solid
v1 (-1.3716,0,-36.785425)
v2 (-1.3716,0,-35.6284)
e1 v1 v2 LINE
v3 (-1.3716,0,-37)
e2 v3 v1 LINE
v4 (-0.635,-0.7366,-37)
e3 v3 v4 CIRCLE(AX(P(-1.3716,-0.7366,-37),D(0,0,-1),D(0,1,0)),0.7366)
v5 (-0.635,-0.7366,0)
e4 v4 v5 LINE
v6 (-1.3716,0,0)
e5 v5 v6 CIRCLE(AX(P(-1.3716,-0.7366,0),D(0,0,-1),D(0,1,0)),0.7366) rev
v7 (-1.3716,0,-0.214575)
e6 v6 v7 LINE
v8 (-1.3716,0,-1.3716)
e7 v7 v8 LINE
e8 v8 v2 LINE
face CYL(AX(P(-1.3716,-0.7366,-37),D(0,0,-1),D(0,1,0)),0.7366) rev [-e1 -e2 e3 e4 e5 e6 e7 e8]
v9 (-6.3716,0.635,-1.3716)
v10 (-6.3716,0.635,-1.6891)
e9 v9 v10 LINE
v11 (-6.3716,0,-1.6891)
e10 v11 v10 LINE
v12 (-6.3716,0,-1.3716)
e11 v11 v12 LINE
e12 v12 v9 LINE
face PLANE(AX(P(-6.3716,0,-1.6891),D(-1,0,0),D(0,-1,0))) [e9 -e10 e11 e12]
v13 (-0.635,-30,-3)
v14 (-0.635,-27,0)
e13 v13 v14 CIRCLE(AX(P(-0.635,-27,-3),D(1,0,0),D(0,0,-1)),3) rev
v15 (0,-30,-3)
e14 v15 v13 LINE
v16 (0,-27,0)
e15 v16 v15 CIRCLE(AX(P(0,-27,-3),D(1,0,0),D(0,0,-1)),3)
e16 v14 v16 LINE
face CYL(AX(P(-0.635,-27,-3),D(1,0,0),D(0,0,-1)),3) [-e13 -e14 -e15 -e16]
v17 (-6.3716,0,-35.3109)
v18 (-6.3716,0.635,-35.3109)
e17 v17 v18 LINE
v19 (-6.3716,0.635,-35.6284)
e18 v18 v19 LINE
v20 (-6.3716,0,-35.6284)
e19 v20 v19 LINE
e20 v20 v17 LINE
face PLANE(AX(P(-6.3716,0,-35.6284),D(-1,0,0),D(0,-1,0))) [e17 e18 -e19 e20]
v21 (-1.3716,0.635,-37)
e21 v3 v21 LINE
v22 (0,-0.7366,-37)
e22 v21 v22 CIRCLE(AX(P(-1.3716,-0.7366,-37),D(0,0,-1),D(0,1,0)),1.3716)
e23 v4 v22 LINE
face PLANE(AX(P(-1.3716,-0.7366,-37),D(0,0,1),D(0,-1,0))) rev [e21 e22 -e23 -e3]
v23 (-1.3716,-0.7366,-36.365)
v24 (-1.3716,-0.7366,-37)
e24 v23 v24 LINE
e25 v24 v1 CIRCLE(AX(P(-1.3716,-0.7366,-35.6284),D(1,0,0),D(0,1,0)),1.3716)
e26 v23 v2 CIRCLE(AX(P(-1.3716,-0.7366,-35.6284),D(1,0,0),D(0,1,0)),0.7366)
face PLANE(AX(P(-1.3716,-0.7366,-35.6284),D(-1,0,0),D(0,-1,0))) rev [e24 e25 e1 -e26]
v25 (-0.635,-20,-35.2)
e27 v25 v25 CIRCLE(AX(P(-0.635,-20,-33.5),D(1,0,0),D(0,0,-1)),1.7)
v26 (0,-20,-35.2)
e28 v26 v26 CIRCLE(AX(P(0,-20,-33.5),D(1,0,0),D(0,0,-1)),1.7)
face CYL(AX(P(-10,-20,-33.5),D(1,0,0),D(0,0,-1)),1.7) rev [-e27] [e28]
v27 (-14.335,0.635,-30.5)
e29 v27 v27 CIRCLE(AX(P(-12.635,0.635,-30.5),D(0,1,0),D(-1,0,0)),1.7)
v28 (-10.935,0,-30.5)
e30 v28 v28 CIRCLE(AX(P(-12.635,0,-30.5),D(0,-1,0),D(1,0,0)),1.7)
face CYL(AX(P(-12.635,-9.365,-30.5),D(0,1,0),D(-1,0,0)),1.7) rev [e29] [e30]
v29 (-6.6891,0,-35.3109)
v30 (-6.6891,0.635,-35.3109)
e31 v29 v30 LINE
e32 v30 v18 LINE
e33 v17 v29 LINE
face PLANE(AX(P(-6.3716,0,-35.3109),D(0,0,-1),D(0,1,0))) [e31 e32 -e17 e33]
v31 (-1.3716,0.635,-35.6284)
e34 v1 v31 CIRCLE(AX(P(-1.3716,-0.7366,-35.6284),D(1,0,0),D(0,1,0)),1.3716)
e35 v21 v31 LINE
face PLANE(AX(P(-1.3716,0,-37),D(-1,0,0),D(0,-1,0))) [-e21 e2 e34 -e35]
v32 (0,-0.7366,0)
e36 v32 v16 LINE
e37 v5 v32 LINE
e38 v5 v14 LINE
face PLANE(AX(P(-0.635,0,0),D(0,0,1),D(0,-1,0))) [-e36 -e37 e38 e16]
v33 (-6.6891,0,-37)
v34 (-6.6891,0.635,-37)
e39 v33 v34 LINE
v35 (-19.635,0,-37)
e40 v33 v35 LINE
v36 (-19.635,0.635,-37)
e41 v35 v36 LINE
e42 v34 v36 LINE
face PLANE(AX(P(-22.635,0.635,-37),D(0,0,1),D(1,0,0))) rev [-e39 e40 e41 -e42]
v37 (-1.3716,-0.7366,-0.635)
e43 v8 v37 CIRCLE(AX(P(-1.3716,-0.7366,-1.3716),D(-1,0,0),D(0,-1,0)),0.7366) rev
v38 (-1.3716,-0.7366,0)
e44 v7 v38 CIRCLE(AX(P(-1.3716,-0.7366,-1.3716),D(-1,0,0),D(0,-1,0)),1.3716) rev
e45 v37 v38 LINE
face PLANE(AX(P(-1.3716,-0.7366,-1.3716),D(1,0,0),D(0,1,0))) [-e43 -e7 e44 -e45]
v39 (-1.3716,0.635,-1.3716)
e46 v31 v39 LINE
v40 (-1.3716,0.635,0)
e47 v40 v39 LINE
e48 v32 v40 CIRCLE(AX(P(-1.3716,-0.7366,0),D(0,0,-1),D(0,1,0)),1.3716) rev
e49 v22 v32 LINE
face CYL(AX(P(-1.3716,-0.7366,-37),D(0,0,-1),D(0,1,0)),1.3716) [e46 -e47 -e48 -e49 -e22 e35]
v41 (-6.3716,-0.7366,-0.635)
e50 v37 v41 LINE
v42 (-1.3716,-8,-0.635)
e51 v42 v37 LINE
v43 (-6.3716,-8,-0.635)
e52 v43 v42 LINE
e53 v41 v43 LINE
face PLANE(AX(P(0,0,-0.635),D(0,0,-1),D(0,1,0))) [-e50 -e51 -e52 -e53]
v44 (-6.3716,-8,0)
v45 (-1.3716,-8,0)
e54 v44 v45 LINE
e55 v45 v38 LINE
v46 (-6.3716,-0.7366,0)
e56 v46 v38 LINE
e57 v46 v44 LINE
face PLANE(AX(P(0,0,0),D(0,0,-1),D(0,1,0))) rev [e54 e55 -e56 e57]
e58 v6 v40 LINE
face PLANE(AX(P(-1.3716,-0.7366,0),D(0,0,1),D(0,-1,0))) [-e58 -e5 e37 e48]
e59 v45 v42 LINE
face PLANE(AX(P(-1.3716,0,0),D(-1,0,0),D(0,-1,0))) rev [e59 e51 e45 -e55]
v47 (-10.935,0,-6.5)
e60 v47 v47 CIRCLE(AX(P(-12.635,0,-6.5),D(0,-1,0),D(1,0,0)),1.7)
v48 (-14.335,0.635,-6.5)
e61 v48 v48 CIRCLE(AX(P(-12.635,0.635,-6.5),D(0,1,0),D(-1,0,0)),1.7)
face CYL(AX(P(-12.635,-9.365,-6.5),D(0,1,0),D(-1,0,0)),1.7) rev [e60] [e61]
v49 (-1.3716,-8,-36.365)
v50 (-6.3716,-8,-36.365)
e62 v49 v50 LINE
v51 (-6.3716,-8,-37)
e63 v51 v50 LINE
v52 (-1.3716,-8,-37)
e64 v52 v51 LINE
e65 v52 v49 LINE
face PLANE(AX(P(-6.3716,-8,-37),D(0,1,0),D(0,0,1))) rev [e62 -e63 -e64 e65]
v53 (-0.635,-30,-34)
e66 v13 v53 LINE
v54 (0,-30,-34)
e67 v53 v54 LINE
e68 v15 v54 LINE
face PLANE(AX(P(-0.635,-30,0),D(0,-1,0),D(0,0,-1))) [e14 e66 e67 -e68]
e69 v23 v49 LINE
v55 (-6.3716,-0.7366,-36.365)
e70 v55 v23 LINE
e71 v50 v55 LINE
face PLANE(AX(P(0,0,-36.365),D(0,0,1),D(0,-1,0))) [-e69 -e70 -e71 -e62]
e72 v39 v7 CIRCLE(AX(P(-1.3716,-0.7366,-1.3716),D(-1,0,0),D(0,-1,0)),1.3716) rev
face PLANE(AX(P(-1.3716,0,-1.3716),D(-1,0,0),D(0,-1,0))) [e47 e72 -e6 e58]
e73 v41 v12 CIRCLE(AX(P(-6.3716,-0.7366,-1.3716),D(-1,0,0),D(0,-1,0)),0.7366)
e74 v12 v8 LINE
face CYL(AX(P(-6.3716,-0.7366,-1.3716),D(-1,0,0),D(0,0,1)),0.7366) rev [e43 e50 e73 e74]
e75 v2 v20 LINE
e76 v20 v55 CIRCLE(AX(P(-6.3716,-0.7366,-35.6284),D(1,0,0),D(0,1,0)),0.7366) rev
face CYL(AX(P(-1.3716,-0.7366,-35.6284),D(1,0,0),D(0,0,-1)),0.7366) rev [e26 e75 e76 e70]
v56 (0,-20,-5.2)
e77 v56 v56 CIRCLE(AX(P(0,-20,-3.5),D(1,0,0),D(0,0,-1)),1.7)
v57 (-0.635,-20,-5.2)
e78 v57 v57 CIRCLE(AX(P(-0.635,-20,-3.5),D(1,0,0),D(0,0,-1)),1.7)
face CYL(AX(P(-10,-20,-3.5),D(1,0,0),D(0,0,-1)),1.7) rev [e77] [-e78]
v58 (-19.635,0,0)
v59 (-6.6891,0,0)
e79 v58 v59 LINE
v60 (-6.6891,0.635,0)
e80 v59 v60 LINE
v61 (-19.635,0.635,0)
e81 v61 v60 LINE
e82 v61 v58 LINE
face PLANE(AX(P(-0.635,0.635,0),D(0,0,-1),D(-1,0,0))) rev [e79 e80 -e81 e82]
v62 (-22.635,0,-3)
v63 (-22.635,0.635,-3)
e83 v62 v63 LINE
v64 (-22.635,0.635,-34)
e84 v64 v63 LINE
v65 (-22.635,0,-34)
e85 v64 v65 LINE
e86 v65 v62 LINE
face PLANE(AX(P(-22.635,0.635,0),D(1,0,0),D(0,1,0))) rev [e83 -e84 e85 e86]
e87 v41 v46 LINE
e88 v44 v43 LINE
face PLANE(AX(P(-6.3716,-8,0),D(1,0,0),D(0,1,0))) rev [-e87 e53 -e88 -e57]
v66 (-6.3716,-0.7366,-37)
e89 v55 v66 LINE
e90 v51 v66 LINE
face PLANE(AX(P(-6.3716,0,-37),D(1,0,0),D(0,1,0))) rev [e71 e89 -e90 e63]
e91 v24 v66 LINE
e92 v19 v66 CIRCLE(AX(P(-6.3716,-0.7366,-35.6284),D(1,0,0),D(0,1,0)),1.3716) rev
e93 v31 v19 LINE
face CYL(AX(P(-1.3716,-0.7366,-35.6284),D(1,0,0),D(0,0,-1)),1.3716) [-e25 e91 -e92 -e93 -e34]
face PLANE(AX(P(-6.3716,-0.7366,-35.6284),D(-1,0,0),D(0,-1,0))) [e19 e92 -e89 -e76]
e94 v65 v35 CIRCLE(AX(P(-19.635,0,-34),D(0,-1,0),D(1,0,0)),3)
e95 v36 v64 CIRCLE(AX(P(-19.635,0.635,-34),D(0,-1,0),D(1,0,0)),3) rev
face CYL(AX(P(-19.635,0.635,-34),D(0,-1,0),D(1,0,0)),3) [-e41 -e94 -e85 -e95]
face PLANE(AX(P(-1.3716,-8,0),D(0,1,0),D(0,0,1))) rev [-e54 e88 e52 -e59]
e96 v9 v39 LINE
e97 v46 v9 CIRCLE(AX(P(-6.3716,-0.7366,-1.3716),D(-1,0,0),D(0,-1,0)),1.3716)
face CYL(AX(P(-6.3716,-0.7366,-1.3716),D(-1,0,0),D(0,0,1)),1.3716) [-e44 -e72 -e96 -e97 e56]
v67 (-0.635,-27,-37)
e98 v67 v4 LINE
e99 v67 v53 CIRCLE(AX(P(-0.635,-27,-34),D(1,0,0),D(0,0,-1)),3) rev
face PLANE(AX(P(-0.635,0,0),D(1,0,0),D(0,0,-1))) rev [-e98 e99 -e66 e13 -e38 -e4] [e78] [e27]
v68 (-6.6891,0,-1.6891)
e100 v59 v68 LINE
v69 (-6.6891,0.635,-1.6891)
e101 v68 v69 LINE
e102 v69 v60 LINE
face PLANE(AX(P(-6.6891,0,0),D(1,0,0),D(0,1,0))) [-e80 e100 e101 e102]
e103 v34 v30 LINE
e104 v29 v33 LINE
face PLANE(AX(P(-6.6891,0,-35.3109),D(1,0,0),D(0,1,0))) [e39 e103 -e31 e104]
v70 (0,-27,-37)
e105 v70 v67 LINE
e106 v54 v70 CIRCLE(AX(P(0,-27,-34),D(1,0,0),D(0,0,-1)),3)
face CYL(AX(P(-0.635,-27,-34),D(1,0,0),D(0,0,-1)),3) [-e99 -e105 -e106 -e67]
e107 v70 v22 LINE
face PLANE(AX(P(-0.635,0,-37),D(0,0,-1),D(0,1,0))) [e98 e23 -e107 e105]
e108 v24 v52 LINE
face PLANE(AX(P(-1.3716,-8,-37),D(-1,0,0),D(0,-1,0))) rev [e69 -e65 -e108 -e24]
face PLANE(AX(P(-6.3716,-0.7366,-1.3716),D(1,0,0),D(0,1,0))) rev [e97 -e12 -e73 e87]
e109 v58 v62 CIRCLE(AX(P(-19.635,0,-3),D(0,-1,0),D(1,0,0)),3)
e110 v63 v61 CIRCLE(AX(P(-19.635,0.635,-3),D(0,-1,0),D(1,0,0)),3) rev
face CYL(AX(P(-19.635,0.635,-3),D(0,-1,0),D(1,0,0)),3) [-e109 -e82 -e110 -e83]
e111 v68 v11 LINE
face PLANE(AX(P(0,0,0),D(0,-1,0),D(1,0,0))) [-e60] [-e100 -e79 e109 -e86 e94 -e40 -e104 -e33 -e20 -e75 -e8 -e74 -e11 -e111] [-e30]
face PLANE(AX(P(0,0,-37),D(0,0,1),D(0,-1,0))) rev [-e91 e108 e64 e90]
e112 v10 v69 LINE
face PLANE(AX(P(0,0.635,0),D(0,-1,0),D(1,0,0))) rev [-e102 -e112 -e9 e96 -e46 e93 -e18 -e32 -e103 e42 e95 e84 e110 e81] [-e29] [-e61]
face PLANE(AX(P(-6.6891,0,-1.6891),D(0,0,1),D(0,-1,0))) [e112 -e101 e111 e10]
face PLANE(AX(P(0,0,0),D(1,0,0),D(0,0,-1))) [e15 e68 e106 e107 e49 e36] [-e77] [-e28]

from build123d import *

# Parameters (mm, degrees)
SKETCH2_W                    = 37
SKETCH2_H                    = 30
BASE_FLANGE1_DEPTH           = 0.635
EDGE_FLANGE1_STRIP_W         = 4.0132
EDGE_FLANGE1_STRIP_H         = 0.635
EDGE_FLANGE1_STRIP_CUT_DEPTH = 37
EDGE_FLANGE1_DEPTH           = 37
EDGE_FLANGE2_START           = -6.6891
EDGE_FLANGE2_DEPTH           = 5.3175
EDGE_FLANGE2_2_DEPTH         = 0.3175
EDGE_FLANGE2_START_2         = -6.3716
EDGE_FLANGE2_3_DEPTH         = 5
EDGE_FLANGE3_START           = -6.6891
EDGE_FLANGE3_DEPTH           = 5.3175
EDGE_FLANGE3_2_DEPTH         = 0.3175
EDGE_FLANGE3_START_2         = -6.3716
EDGE_FLANGE3_3_DEPTH         = 5
SKETCH14_R                   = 1.7
CUT_EXTRUDE1_DEPTH           = 10
FILLET1_R                    = 3
SKETCH15_R                   = 1.7
CUT_EXTRUDE2_DEPTH           = 10


# Read off the part's stored shape, not the designer's step: Edge-Flange2, Edge-Flange3
# Sheet-metal steps are written as plain solids
with BuildPart() as part:
    # Sketch2 → Base-Flange1 (new body)
    with BuildSketch(Plane(origin=(0, 0, 0), x_dir=(0, 0, -1), z_dir=(1, 0, 0))):
        with Locations((18.5, -15)):
            Rectangle(SKETCH2_W, SKETCH2_H)
    extrude(amount=-BASE_FLANGE1_DEPTH)

    # Edge-Flange1 strip (across the edge) → Edge-Flange1 strip cut (cut)
    with BuildSketch(Plane(origin=(-0.635, 0, 0), x_dir=(0, -1, 0), z_dir=(0, 0, -1))):
        with Locations((-1.27, -0.3175)):
            Rectangle(EDGE_FLANGE1_STRIP_W, EDGE_FLANGE1_STRIP_H)
    extrude(amount=EDGE_FLANGE1_STRIP_CUT_DEPTH, mode=Mode.SUBTRACT)

    # Edge-Flange1 section (across the edge) → Edge-Flange1 (add)
    with BuildSketch(Plane(origin=(-0.635, 0, 0), x_dir=(0, -1, 0), z_dir=(0, 0, -1))):
        with BuildLine():
            Line((-0.635, 0.7366), (-0.635, 22))
            Line((-0.635, 22), (0, 22))
            Line((0, 22), (0, 0.7366))
            ThreePointArc((0, 0.7366), (0.215745145, 0.215745145), (0.7366, 0))
            Line((0.7366, 0), (0.7366, -0.635))
            ThreePointArc((0.7366, -0.635), (-0.233267661, -0.233267661), (-0.635, 0.7366))
        make_face()
    extrude(amount=EDGE_FLANGE1_DEPTH)

    # Edge-Flange2 outline → Edge-Flange2 (cut)
    with BuildSketch(Plane.YZ.offset(EDGE_FLANGE2_START)):
        with BuildLine():
            Line((0, 0), (0, -0.214574936))
            ThreePointArc((0, -0.214574936), (0.465815718, -0.711688642), (0.635, -1.3716))
            Line((0.635, -1.3716), (0.635, 0))
            Line((0.635, 0), (0, 0))
        make_face()
    extrude(amount=EDGE_FLANGE2_DEPTH, mode=Mode.SUBTRACT)

    # Edge-Flange2 2 outline → Edge-Flange2 2 (cut)
    with BuildSketch(Plane.YZ.offset(EDGE_FLANGE2_START)):
        with BuildLine():
            ThreePointArc((0.635, -1.3716), (0.465815718, -0.711688642), (0, -0.214574936))
            Line((0, -0.214574936), (0, -1.6891))
            Line((0, -1.6891), (0.635, -1.6891))
            Line((0.635, -1.6891), (0.635, -1.3716))
        make_face()
    extrude(amount=EDGE_FLANGE2_2_DEPTH, mode=Mode.SUBTRACT)

    # Edge-Flange2 3 outline → Edge-Flange2 3 (add)
    with BuildSketch(Plane.YZ.offset(EDGE_FLANGE2_START_2)):
        with BuildLine():
            Line((-0.7366, 0), (-8, 0))
            Line((-8, 0), (-8, -0.635))
            Line((-8, -0.635), (-0.7366, -0.635))
            ThreePointArc((-0.7366, -0.635), (-0.215745145, -0.850745145), (0, -1.3716))
            Line((0, -1.3716), (0, -0.214574936))
            ThreePointArc((0, -0.214574936), (-0.352991488, -0.054735896), (-0.7366, 0))
        make_face()
    extrude(amount=EDGE_FLANGE2_3_DEPTH)

    # Edge-Flange3 outline → Edge-Flange3 (cut)
    with BuildSketch(Plane.YZ.offset(EDGE_FLANGE3_START)):
        with BuildLine():
            ThreePointArc((0.635, -35.6284), (0.465815718, -36.288311358), (0, -36.785425064))
            Line((0, -36.785425064), (0, -37))
            Line((0, -37), (0.635, -37))
            Line((0.635, -37), (0.635, -35.6284))
        make_face()
    extrude(amount=EDGE_FLANGE3_DEPTH, mode=Mode.SUBTRACT)

    # Edge-Flange3 2 outline → Edge-Flange3 2 (cut)
    with BuildSketch(Plane.YZ.offset(EDGE_FLANGE3_START)):
        with BuildLine():
            Line((0, -35.3109), (0, -36.785425064))
            ThreePointArc((0, -36.785425064), (0.465815718, -36.288311358), (0.635, -35.6284))
            Line((0.635, -35.6284), (0.635, -35.3109))
            Line((0.635, -35.3109), (0, -35.3109))
        make_face()
    extrude(amount=EDGE_FLANGE3_2_DEPTH, mode=Mode.SUBTRACT)

    # Edge-Flange3 3 outline → Edge-Flange3 3 (add)
    with BuildSketch(Plane.YZ.offset(EDGE_FLANGE3_START_2)):
        with BuildLine():
            Line((-8, -37), (-0.7366, -37))
            ThreePointArc((-0.7366, -37), (-0.352991488, -36.945264104), (0, -36.785425064))
            Line((0, -36.785425064), (0, -35.6284))
            ThreePointArc((0, -35.6284), (-0.215745145, -36.149254855), (-0.7366, -36.365))
            Line((-0.7366, -36.365), (-8, -36.365))
            Line((-8, -36.365), (-8, -37))
        make_face()
    extrude(amount=EDGE_FLANGE3_3_DEPTH)

    # Sketch14 → Cut-Extrude1 (cut)
    with BuildSketch(Plane(origin=(0, 0, 0), x_dir=(0, 0, -1), z_dir=(1, 0, 0))):
        with Locations((3.5, -20)):
            Circle(SKETCH14_R)
        with Locations((33.5, -20)):
            Circle(SKETCH14_R)
    extrude(amount=-CUT_EXTRUDE1_DEPTH, mode=Mode.SUBTRACT)

    # Fillet1
    fillet1_edges = [part.edges().sort_by_distance(p)[0] for p in [
        (-22.635, 0.3175, 0),
        (-22.635, 0.3175, -37),
        (-0.3175, -30, -37),
        (-0.3175, -30, 0),
    ]]
    fillet(fillet1_edges, radius=FILLET1_R)

    # Sketch15 → Cut-Extrude2 (cut)
    with BuildSketch(Plane(origin=(0, 0.635, 0), x_dir=(1, 0, 0), z_dir=(0, 1, 0))):
        with Locations(Location((-12.635, 30.5, 0), (0, 0, 180))):
            Circle(SKETCH15_R)
        with Locations(Location((-12.635, 6.5, 0), (0, 0, 180))):
            Circle(SKETCH15_R)
    extrude(amount=-CUT_EXTRUDE2_DEPTH, mode=Mode.SUBTRACT)


solid = part.part
